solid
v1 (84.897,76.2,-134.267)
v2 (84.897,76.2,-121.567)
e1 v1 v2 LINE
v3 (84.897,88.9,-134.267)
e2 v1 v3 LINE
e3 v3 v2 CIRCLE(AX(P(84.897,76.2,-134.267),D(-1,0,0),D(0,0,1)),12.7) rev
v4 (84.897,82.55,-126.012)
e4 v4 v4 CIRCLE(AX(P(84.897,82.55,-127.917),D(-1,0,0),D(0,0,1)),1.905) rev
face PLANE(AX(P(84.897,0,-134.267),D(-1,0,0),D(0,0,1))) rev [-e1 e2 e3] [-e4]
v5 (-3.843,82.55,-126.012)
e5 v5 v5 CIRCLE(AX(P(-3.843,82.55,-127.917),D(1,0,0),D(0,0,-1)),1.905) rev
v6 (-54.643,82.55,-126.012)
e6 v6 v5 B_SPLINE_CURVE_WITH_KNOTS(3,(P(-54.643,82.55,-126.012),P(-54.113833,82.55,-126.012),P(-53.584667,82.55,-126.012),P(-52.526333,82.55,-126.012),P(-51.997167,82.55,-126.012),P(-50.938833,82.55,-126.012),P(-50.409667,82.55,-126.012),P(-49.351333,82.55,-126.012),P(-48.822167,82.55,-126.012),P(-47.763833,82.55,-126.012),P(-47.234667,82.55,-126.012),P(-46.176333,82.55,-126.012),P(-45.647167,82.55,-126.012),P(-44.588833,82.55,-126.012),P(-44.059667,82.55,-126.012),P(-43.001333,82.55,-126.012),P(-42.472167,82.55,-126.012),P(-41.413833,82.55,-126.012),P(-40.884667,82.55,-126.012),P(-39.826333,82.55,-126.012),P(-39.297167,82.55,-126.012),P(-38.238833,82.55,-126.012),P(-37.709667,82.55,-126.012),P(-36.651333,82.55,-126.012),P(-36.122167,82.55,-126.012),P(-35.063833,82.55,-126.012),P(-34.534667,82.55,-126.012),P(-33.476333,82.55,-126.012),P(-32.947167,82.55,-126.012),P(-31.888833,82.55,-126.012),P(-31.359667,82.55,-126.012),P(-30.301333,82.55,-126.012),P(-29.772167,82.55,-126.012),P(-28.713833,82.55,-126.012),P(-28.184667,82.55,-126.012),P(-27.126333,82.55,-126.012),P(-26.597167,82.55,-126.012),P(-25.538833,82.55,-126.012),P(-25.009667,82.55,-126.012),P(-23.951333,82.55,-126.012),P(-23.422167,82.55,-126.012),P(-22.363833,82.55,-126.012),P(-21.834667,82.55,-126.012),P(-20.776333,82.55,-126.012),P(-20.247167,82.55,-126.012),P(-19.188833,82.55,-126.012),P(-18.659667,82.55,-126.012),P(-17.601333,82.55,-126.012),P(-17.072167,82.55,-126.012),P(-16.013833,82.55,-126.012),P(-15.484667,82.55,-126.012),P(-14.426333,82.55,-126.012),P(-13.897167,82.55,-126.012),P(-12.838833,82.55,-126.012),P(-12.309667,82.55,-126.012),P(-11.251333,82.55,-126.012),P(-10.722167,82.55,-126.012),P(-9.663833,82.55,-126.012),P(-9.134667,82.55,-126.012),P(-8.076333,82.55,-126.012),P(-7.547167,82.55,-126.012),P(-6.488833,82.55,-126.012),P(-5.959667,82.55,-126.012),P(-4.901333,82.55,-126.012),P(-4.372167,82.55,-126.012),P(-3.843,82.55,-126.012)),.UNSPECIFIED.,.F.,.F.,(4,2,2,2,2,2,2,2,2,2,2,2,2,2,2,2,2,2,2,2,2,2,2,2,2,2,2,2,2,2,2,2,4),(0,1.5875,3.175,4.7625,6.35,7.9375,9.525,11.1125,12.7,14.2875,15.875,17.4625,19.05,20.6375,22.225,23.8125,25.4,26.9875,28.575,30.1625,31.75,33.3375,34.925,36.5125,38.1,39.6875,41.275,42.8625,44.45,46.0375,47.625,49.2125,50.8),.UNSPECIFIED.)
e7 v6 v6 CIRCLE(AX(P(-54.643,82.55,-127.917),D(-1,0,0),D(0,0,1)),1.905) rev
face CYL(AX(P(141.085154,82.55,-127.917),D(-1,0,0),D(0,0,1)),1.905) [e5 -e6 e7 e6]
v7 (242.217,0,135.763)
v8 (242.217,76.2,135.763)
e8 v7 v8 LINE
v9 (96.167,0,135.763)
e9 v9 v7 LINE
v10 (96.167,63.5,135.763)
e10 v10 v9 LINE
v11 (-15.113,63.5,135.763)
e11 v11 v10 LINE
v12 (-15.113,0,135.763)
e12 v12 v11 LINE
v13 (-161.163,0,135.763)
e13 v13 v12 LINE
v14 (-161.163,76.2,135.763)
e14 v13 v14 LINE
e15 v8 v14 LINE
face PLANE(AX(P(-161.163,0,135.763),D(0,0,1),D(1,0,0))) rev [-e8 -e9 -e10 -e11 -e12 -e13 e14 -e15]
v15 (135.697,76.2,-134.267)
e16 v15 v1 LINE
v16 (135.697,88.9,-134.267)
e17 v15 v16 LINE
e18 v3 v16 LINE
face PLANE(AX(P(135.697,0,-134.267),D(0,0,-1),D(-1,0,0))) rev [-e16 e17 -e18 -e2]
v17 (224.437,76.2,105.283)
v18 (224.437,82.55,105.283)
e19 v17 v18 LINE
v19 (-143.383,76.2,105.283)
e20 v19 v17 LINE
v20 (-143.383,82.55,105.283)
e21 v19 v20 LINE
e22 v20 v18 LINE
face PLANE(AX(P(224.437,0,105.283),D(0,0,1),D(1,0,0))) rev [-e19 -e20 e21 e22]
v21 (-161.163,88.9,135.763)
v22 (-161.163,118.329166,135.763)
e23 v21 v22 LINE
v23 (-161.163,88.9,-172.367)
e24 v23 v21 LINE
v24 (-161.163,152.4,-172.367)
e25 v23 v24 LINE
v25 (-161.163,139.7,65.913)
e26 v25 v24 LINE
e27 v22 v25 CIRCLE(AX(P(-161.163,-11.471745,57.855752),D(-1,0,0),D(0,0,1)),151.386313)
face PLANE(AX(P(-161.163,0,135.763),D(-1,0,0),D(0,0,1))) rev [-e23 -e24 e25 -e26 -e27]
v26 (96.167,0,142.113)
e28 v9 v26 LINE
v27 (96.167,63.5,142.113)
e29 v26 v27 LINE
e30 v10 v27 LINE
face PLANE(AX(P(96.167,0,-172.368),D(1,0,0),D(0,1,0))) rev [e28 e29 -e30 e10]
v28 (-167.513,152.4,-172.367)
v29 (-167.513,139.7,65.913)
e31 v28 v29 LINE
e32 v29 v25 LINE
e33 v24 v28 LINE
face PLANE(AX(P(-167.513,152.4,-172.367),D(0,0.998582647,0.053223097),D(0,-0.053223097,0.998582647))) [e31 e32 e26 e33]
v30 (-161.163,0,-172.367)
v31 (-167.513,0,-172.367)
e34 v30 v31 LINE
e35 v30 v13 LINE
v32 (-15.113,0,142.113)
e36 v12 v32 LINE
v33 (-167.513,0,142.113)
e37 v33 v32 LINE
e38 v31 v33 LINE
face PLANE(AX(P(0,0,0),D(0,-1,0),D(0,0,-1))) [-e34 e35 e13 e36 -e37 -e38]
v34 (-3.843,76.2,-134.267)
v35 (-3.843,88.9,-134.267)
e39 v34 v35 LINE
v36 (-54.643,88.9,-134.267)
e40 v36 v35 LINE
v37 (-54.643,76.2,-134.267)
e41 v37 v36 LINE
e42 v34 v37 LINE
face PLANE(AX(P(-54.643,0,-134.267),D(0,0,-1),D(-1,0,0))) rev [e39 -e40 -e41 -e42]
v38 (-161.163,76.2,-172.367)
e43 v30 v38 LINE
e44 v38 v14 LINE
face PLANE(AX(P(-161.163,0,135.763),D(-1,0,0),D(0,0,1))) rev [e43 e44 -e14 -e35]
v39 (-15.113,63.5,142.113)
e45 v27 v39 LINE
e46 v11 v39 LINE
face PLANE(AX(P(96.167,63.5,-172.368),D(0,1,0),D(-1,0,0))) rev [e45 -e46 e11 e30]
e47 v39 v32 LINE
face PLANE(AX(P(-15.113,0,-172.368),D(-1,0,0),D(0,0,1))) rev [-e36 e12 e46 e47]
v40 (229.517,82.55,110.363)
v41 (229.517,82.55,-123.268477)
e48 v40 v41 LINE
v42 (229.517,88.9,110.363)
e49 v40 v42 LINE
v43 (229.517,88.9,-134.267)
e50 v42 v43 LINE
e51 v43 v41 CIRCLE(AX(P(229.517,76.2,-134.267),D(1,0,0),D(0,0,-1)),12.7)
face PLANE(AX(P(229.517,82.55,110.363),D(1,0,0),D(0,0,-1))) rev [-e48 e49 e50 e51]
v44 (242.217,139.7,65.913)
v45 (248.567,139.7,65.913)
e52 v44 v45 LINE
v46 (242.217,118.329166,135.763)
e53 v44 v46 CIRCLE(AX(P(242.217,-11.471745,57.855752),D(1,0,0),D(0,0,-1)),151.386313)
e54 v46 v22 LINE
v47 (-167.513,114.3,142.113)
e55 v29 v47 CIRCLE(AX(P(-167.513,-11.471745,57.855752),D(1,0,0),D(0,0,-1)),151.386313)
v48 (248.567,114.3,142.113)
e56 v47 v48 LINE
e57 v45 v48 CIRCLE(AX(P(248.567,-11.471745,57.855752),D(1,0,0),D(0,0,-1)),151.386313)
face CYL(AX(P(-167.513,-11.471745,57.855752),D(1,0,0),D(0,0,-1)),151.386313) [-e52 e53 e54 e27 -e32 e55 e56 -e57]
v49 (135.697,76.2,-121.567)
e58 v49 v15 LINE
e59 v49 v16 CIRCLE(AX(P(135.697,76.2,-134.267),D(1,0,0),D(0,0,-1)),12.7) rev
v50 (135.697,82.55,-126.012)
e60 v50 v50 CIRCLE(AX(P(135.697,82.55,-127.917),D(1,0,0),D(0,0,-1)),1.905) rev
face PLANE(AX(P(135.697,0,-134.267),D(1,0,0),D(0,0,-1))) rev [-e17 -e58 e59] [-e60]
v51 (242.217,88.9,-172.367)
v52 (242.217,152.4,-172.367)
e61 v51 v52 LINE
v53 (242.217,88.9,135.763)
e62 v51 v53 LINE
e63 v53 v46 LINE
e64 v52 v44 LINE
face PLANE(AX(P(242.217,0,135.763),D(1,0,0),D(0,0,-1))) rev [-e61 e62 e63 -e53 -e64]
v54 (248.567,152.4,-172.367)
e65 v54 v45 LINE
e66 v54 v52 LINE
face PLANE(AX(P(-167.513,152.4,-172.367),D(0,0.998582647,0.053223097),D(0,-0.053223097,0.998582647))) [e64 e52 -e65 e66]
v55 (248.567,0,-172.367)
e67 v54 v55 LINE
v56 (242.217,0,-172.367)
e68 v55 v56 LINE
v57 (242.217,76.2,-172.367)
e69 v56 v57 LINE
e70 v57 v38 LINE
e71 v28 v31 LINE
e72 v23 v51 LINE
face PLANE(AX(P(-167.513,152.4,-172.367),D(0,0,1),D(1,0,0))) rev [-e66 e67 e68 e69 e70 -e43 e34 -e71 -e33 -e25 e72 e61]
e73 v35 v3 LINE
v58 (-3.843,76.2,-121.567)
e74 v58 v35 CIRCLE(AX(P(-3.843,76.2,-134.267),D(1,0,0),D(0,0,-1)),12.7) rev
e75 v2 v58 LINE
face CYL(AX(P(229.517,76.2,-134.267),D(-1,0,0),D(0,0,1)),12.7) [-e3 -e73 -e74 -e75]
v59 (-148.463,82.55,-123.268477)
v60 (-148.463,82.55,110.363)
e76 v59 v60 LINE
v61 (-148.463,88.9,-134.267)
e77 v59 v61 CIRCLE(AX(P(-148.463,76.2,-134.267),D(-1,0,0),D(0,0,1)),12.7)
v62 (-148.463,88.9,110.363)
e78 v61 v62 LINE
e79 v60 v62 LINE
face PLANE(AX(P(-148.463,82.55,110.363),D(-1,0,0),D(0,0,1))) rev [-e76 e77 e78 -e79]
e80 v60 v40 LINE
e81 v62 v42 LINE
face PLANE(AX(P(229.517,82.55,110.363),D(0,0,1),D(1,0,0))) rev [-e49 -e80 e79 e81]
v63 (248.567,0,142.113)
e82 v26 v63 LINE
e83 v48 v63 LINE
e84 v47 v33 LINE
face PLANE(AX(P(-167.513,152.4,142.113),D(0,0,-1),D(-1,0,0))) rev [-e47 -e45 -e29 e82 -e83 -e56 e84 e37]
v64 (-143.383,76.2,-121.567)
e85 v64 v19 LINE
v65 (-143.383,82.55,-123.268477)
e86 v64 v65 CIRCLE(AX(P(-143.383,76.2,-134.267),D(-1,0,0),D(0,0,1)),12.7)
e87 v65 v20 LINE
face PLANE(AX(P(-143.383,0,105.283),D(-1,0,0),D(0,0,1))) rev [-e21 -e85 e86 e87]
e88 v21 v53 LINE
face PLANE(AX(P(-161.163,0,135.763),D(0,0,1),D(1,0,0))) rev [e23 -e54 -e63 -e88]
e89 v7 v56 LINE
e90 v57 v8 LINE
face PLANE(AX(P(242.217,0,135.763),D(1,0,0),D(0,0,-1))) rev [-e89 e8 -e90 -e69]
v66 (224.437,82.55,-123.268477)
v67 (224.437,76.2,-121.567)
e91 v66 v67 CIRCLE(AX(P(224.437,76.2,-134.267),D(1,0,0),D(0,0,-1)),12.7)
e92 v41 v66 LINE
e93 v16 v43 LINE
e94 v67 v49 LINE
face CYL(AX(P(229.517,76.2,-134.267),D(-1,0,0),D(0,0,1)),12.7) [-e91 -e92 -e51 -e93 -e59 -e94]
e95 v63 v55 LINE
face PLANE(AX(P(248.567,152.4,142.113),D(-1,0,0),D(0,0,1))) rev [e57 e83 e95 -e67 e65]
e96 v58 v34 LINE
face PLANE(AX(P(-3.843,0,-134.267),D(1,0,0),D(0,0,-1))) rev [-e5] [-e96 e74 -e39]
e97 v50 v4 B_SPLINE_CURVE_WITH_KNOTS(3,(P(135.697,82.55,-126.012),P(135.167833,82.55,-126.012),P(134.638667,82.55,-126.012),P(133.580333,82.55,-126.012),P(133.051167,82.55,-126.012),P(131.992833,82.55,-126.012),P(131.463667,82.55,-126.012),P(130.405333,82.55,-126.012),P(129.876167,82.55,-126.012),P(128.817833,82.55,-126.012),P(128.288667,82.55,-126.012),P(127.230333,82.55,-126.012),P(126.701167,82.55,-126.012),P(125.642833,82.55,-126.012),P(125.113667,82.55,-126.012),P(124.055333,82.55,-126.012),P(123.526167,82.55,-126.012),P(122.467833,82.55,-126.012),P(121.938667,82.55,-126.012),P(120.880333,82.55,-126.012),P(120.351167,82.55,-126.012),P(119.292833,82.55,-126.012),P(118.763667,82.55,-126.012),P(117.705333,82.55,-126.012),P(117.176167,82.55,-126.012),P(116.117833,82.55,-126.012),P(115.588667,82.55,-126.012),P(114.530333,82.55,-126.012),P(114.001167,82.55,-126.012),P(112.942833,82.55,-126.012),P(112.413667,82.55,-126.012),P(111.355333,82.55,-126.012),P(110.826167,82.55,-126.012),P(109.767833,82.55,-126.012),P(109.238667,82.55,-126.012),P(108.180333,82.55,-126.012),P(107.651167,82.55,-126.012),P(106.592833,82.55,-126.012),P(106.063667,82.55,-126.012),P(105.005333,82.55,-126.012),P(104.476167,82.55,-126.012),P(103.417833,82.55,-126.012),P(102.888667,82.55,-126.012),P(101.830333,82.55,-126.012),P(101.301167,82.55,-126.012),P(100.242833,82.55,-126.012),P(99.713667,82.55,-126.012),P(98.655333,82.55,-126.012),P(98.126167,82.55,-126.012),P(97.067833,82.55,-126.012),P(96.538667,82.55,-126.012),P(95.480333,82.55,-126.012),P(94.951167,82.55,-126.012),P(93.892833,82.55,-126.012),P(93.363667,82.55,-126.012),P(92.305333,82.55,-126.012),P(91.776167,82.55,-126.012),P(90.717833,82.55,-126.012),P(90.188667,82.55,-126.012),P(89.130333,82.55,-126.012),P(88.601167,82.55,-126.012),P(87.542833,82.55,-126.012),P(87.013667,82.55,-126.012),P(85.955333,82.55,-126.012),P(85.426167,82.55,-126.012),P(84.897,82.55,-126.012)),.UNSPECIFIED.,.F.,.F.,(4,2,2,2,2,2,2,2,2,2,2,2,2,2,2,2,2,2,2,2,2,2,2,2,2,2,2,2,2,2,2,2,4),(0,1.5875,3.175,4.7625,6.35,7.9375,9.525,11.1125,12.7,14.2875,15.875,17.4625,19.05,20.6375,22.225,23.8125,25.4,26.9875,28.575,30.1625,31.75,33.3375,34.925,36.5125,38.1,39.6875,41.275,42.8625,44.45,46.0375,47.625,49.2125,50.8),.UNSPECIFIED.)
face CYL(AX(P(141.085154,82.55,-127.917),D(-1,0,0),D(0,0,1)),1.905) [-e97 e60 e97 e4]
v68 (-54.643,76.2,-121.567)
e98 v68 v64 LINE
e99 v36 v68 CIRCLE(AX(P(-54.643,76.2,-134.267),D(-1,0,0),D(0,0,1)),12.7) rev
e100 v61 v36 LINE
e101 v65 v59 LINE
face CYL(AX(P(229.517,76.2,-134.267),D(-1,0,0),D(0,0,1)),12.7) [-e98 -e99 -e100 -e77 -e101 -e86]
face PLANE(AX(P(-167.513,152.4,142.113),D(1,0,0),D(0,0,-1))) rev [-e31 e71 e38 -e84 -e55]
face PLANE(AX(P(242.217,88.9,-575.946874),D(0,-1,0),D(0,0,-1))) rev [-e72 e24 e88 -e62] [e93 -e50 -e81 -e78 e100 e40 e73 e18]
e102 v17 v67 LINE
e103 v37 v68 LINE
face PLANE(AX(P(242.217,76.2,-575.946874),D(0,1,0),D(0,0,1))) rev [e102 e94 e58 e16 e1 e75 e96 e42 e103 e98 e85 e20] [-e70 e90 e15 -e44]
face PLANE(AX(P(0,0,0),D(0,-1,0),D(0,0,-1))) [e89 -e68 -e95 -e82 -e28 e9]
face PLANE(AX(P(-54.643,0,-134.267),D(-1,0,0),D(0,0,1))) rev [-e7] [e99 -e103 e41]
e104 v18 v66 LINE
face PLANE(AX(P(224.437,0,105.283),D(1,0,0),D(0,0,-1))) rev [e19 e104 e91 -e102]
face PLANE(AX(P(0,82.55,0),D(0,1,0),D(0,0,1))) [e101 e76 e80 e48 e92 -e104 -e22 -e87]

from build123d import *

# Parameters (mm, degrees)
SKETCH1_W               = 416.08
SKETCH1_H               = 314.48
BOSS_EXTRUDE2_DEPTH     = 152.4
SKETCH2_W               = 403.38
SKETCH2_H               = 308.13
CUT_EXTRUDE1_DEPTH      = 339.705913999
CUT_EXTRUDE2_DEPTH      = 476.456316699
CUT_EXTRUDE3_REACH      = 430.846
SKETCH4_W               = 111.28
SKETCH4_H               = 63.5
SKETCH5_W               = 403.38
SKETCH5_H               = 12.7
BOSS_EXTRUDE3_DEPTH     = 308.13
SKETCH6_W               = 377.98
SKETCH6_H               = 231.93
CUT_EXTRUDE4_DEPTH      = 6.35
CUT_EXTRUDE5_DEPTH      = 314.544954796
CUT_EXTRUDE5_DEPTH_BACK = 314.544954796
FILLET2_R               = 12.7
BOSS_EXTRUDE4_REACH     = 382.621
SKETCH8_R               = 1.905


with BuildPart() as part:
    # Sketch1 → Boss-Extrude2 (new body)
    with BuildSketch(Plane(origin=(0, 0, 0), x_dir=(1, 0, 0), z_dir=(0, 1, 0))):
        with Locations((40.527, 15.127)):
            Rectangle(SKETCH1_W, SKETCH1_H)
    extrude(amount=BOSS_EXTRUDE2_DEPTH)

    # Sketch2 → Cut-Extrude1 (cut, through all)
    with BuildSketch(Plane(origin=(0, 152.4, 0), x_dir=(1, 0, 0), z_dir=(0, 1, 0))):
        with Locations((40.527, 18.302)):
            Rectangle(SKETCH2_W, SKETCH2_H)
    extrude(amount=-CUT_EXTRUDE1_DEPTH, mode=Mode.SUBTRACT)

    # Sketch3 → Cut-Extrude2 (cut, through all)
    with BuildSketch(Plane(origin=(248.567, 0, 0), x_dir=(0, 0, -1), z_dir=(1, 0, 0))):
        with BuildLine():
            Line((-142.113, 114.3), (-142.113, 152.4))
            Line((-142.113, 152.4), (172.367, 152.4))
            Line((172.367, 152.4), (-65.913, 139.7))
            ThreePointArc((-65.913, 139.7), (-105.728307199, 132.145921598), (-142.113, 114.3))
        make_face()
    extrude(amount=-CUT_EXTRUDE2_DEPTH, mode=Mode.SUBTRACT)

    # Sketch4 → Cut-Extrude3 (cut, up to next)
    with BuildSketch(Plane.XY.offset(142.113), mode=Mode.PRIVATE) as cut_extrude3_sk1:
        with Locations((40.527, 31.75)):
            Rectangle(SKETCH4_W, SKETCH4_H)
    cut_extrude3_tool1 = extrude(cut_extrude3_sk1.sketch, amount=-CUT_EXTRUDE3_REACH, mode=Mode.PRIVATE) & part.part
    add(cut_extrude3_tool1.solids().sort_by_distance((40.527, 31.75, 142.113))[0], mode=Mode.SUBTRACT)

    # Sketch5 → Boss-Extrude3 (add)
    with BuildSketch(Plane(origin=(0, 0, 135.763), x_dir=(-1, 0, 0), z_dir=(0, 0, -1))):
        with Locations((-40.527, 82.55)):
            Rectangle(SKETCH5_W, SKETCH5_H)
    extrude(amount=BOSS_EXTRUDE3_DEPTH)

    # Sketch6 → Cut-Extrude4 (cut)
    with BuildSketch(Plane(origin=(0, 88.9, 0), x_dir=(1, 0, 0), z_dir=(0, 1, 0))):
        with Locations((40.527, 5.602)):
            Rectangle(SKETCH6_W, SKETCH6_H)
    extrude(amount=-CUT_EXTRUDE4_DEPTH, mode=Mode.SUBTRACT)

    # Sketch7 → Cut-Extrude5 (cut, two sides: drawn at the far end of the back side and taken through both)
    with BuildSketch(Plane(origin=(0, 82.55, 0), x_dir=(1, 0, 0), z_dir=(0, 1, 0)).offset(-CUT_EXTRUDE5_DEPTH_BACK)):
        Polygon((-54.643, 134.267), (-3.843, 134.267), (-3.843, 121.567), (84.897, 121.567), (84.897, 134.267), (135.697, 134.267), (135.697, 121.567), (224.437, 121.567), (224.437, -105.283), (-143.383, -105.283), (-143.383, 121.567), (-54.643, 121.567), align=None)
    extrude(amount=CUT_EXTRUDE5_DEPTH + CUT_EXTRUDE5_DEPTH_BACK, mode=Mode.SUBTRACT)

    # Fillet2
    fillet2_edges = [part.edges().sort_by_distance(p)[0] for p in [
        (182.607, 88.9, -121.567),
        (40.527, 88.9, -121.567),
        (-101.553, 88.9, -121.567),
    ]]
    fillet(fillet2_edges, radius=FILLET2_R - 0.0001)  # a hair under: the kernel refuses the full size

    # Boss-Extrude4: up to this face of the body (flat: up to its plane)
    boss_extrude4_end = Plane(part.part.faces().sort_by_distance((135.697, 81.590060551, -128.876939449))[0])
    # Sketch8 → Boss-Extrude4 (add, up to the picked face)
    with BuildSketch(Plane(origin=(-54.643, 0, 0), x_dir=(0, 0, -1), z_dir=(1, 0, 0)), mode=Mode.PRIVATE) as boss_extrude4_sk1:
        with Locations(Location((127.917, 82.55, 0), (0, 0, 180))):
            Circle(SKETCH8_R)
    boss_extrude4_tool1 = split(extrude(boss_extrude4_sk1.sketch, amount=BOSS_EXTRUDE4_REACH, mode=Mode.PRIVATE), bisect_by=boss_extrude4_end, keep=Keep.BOTH, mode=Mode.PRIVATE)
    add(boss_extrude4_tool1.solids().sort_by(Axis((-54.643, 82.55, -127.917), (1, 0, 0)))[0])


solid = part.part
